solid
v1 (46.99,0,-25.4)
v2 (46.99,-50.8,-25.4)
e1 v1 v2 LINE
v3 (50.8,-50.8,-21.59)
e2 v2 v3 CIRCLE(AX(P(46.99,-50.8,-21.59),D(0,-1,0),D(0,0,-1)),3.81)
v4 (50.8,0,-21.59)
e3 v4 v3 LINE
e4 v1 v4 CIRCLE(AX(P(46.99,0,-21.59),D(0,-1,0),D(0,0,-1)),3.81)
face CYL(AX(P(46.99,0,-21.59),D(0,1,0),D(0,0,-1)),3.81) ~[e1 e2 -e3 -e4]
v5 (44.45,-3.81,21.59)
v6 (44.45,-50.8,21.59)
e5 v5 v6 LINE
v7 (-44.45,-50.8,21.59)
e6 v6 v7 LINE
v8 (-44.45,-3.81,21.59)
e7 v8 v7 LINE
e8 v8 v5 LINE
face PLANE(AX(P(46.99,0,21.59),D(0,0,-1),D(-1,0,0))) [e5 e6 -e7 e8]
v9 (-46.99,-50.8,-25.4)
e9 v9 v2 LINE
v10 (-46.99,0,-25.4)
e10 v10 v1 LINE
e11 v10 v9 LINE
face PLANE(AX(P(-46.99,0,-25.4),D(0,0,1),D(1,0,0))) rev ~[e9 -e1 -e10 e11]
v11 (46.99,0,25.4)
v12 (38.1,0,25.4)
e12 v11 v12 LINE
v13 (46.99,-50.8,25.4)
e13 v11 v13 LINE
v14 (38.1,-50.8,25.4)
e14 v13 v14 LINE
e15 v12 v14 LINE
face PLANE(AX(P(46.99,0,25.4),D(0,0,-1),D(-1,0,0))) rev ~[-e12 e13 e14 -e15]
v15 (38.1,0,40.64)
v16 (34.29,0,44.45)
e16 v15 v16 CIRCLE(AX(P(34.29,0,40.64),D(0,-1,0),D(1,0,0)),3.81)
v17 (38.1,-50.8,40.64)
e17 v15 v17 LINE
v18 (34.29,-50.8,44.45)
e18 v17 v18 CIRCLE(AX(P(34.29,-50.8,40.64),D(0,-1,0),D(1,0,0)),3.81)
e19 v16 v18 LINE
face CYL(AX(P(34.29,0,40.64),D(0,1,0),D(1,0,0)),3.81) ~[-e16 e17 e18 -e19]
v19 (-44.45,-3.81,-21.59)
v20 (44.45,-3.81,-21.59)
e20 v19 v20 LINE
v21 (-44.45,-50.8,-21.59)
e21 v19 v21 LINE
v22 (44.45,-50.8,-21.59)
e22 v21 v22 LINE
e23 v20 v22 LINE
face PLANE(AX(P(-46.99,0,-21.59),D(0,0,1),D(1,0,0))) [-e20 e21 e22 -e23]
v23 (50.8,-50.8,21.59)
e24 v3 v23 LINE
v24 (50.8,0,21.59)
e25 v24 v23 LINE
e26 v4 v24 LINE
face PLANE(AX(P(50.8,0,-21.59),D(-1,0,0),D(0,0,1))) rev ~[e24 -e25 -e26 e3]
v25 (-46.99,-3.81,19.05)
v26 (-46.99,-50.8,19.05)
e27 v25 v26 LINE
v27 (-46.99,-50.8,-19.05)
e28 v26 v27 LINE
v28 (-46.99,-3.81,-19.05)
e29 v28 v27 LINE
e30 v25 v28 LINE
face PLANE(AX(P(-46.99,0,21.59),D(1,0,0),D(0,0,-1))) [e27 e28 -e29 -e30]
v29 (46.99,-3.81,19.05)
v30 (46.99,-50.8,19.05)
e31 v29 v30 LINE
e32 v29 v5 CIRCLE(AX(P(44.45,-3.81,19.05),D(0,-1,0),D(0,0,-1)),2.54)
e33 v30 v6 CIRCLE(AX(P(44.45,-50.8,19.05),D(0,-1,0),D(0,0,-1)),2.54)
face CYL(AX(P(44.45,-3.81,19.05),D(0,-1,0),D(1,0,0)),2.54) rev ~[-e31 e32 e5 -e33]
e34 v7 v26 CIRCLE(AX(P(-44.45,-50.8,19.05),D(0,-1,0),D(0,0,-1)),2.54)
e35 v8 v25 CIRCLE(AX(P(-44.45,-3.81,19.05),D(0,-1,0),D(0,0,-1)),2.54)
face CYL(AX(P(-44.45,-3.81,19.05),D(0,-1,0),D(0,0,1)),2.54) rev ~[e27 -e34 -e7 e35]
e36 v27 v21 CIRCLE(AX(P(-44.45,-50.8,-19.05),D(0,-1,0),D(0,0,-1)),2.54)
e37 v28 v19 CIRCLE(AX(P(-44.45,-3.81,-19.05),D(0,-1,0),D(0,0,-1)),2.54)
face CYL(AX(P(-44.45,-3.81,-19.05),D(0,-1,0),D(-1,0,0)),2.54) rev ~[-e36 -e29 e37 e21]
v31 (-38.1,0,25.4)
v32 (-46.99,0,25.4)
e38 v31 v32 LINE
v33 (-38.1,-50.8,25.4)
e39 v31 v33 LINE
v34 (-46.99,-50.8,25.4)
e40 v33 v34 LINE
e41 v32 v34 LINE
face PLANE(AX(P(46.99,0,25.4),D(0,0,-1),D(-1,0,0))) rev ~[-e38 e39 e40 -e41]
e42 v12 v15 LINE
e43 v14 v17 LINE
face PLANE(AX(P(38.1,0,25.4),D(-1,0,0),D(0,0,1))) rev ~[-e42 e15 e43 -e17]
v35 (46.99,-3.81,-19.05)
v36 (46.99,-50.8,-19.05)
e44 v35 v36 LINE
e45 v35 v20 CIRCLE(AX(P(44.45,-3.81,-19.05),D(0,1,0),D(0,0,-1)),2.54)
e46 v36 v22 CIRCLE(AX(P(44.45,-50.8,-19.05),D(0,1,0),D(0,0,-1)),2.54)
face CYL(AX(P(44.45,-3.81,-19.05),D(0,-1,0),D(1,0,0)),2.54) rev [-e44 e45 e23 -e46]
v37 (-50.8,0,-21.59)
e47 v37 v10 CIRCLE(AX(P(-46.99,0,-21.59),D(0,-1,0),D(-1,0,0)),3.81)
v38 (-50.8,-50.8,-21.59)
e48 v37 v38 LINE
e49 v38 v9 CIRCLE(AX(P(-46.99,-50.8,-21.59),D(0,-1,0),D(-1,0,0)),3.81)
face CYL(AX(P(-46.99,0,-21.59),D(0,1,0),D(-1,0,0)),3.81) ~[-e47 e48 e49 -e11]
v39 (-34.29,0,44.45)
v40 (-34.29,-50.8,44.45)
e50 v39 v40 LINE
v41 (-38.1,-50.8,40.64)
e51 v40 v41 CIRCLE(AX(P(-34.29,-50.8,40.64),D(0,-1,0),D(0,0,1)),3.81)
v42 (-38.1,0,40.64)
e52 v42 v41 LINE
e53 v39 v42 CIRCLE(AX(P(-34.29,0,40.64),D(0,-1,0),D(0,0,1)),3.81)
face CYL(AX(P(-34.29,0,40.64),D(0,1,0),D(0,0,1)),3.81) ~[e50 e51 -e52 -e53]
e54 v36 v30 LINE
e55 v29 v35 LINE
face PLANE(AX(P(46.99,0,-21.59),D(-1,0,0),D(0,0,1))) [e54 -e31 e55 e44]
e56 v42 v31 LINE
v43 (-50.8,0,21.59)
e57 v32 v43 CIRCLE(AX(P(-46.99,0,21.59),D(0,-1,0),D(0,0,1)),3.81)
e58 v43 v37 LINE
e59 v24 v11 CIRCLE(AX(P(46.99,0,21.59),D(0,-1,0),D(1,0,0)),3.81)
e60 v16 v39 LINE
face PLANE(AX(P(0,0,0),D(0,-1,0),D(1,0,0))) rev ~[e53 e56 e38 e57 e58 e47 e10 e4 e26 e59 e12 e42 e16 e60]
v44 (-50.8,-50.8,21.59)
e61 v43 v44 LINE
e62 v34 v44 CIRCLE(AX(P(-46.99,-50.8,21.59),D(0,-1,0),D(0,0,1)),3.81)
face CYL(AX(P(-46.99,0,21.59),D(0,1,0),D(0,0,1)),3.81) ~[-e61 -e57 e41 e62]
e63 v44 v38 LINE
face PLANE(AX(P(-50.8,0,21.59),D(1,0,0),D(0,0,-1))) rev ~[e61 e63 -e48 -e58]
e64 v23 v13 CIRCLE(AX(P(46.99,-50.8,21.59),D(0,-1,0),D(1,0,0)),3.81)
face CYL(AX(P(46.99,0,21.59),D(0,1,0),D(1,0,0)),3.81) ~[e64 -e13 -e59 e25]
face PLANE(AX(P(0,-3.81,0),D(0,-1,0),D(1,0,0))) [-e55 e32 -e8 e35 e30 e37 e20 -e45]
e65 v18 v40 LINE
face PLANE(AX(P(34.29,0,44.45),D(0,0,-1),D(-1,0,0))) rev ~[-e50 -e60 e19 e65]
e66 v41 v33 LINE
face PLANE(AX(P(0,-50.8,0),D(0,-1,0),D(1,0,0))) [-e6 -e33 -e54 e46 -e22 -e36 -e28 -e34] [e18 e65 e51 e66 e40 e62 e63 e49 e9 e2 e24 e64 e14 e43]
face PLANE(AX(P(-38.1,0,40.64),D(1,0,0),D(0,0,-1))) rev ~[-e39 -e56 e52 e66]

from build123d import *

# Parameters (mm, degrees)
F1_DEPTH = 50.8
F2_T     = 3.81
F3_R     = 2.54
F4_DEPTH = 50.8


# Not quite as in the source:
# - a shell that OpenCascade refuses in one call is made with other operations: the cavity is built on its own and cut out


with BuildPart() as f1:
    # F0 (on Front) → F1 (new body)
    with BuildSketch(Plane.XZ):
        with BuildLine():
            ThreePointArc((50.8, 21.59), (49.6840768363, 24.2840768363), (46.99, 25.4))
            Line((46.99, 25.4), (38.1, 25.4))
            Line((38.1, 25.4), (-38.1, 25.4))
            Line((-38.1, 25.4), (-46.99, 25.4))
            ThreePointArc((-46.99, 25.4), (-49.6840768363, 24.2840768363), (-50.8, 21.59))
            Line((-50.8, 21.59), (-50.8, -21.59))
            ThreePointArc((-50.8, -21.59), (-49.6840768363, -24.2840768363), (-46.99, -25.4))
            Line((-46.99, -25.4), (46.99, -25.4))
            ThreePointArc((46.99, -25.4), (49.6840768363, -24.2840768363), (50.8, -21.59))
            Line((50.8, -21.59), (50.8, 21.59))
        make_face()
    extrude(amount=F1_DEPTH)

    # F2: shell of thickness 3.81, made by hand


with BuildPart() as f2_core1:
    # F2_t2: copy of F1
    add(f1.part)

    # the walls: a layer under each face that stays
    f2_faces = [f2_core1.faces().sort_by_distance(p)[0] for p in [
        (0, -25.4, -25.4),
        (-50.8, -25.4, 0),
        (0, 0, 0),
        (0, -25.4, 25.4),
        (50.8, -25.4, 0),
    ]]
    thicken(f2_faces, amount=-F2_T, mode=Mode.SUBTRACT)


with BuildPart() as f1_1:
    add(f1.part)

    # what is left inside the walls is the cavity
    f2_cavity = [f2_core1.part.solids().sort_by_distance(p)[0] for p in [
        (0, -35.136667, -21.5519),
    ]]
    add(f2_cavity, mode=Mode.SUBTRACT)

    # F3
    f3_edges = [f1_1.edges().sort_by_distance(p)[0] for p in [
        (-46.99, -27.305, 21.59),
        (-46.99, -27.305, -21.59),
        (46.99, -27.305, -21.59),
        (46.99, -27.305, 21.59),
    ]]
    fillet(f3_edges, radius=F3_R)

    # F0 (on Front) → F4 (join)
    with BuildSketch(Plane.XZ):
        with BuildLine():
            Line((-38.1, 25.4), (38.1, 25.4))
            Line((38.1, 25.4), (38.1, 40.64))
            ThreePointArc((38.1, 40.64), (36.9840768363, 43.3340768363), (34.29, 44.45))
            Line((34.29, 44.45), (0, 44.45))
            Line((0, 44.45), (-34.29, 44.45))
            ThreePointArc((-34.29, 44.45), (-36.9840768363, 43.3340768363), (-38.1, 40.64))
            Line((-38.1, 40.64), (-38.1, 25.4))
        make_face()
    extrude(amount=F4_DEPTH)


solid = f1_1.part
